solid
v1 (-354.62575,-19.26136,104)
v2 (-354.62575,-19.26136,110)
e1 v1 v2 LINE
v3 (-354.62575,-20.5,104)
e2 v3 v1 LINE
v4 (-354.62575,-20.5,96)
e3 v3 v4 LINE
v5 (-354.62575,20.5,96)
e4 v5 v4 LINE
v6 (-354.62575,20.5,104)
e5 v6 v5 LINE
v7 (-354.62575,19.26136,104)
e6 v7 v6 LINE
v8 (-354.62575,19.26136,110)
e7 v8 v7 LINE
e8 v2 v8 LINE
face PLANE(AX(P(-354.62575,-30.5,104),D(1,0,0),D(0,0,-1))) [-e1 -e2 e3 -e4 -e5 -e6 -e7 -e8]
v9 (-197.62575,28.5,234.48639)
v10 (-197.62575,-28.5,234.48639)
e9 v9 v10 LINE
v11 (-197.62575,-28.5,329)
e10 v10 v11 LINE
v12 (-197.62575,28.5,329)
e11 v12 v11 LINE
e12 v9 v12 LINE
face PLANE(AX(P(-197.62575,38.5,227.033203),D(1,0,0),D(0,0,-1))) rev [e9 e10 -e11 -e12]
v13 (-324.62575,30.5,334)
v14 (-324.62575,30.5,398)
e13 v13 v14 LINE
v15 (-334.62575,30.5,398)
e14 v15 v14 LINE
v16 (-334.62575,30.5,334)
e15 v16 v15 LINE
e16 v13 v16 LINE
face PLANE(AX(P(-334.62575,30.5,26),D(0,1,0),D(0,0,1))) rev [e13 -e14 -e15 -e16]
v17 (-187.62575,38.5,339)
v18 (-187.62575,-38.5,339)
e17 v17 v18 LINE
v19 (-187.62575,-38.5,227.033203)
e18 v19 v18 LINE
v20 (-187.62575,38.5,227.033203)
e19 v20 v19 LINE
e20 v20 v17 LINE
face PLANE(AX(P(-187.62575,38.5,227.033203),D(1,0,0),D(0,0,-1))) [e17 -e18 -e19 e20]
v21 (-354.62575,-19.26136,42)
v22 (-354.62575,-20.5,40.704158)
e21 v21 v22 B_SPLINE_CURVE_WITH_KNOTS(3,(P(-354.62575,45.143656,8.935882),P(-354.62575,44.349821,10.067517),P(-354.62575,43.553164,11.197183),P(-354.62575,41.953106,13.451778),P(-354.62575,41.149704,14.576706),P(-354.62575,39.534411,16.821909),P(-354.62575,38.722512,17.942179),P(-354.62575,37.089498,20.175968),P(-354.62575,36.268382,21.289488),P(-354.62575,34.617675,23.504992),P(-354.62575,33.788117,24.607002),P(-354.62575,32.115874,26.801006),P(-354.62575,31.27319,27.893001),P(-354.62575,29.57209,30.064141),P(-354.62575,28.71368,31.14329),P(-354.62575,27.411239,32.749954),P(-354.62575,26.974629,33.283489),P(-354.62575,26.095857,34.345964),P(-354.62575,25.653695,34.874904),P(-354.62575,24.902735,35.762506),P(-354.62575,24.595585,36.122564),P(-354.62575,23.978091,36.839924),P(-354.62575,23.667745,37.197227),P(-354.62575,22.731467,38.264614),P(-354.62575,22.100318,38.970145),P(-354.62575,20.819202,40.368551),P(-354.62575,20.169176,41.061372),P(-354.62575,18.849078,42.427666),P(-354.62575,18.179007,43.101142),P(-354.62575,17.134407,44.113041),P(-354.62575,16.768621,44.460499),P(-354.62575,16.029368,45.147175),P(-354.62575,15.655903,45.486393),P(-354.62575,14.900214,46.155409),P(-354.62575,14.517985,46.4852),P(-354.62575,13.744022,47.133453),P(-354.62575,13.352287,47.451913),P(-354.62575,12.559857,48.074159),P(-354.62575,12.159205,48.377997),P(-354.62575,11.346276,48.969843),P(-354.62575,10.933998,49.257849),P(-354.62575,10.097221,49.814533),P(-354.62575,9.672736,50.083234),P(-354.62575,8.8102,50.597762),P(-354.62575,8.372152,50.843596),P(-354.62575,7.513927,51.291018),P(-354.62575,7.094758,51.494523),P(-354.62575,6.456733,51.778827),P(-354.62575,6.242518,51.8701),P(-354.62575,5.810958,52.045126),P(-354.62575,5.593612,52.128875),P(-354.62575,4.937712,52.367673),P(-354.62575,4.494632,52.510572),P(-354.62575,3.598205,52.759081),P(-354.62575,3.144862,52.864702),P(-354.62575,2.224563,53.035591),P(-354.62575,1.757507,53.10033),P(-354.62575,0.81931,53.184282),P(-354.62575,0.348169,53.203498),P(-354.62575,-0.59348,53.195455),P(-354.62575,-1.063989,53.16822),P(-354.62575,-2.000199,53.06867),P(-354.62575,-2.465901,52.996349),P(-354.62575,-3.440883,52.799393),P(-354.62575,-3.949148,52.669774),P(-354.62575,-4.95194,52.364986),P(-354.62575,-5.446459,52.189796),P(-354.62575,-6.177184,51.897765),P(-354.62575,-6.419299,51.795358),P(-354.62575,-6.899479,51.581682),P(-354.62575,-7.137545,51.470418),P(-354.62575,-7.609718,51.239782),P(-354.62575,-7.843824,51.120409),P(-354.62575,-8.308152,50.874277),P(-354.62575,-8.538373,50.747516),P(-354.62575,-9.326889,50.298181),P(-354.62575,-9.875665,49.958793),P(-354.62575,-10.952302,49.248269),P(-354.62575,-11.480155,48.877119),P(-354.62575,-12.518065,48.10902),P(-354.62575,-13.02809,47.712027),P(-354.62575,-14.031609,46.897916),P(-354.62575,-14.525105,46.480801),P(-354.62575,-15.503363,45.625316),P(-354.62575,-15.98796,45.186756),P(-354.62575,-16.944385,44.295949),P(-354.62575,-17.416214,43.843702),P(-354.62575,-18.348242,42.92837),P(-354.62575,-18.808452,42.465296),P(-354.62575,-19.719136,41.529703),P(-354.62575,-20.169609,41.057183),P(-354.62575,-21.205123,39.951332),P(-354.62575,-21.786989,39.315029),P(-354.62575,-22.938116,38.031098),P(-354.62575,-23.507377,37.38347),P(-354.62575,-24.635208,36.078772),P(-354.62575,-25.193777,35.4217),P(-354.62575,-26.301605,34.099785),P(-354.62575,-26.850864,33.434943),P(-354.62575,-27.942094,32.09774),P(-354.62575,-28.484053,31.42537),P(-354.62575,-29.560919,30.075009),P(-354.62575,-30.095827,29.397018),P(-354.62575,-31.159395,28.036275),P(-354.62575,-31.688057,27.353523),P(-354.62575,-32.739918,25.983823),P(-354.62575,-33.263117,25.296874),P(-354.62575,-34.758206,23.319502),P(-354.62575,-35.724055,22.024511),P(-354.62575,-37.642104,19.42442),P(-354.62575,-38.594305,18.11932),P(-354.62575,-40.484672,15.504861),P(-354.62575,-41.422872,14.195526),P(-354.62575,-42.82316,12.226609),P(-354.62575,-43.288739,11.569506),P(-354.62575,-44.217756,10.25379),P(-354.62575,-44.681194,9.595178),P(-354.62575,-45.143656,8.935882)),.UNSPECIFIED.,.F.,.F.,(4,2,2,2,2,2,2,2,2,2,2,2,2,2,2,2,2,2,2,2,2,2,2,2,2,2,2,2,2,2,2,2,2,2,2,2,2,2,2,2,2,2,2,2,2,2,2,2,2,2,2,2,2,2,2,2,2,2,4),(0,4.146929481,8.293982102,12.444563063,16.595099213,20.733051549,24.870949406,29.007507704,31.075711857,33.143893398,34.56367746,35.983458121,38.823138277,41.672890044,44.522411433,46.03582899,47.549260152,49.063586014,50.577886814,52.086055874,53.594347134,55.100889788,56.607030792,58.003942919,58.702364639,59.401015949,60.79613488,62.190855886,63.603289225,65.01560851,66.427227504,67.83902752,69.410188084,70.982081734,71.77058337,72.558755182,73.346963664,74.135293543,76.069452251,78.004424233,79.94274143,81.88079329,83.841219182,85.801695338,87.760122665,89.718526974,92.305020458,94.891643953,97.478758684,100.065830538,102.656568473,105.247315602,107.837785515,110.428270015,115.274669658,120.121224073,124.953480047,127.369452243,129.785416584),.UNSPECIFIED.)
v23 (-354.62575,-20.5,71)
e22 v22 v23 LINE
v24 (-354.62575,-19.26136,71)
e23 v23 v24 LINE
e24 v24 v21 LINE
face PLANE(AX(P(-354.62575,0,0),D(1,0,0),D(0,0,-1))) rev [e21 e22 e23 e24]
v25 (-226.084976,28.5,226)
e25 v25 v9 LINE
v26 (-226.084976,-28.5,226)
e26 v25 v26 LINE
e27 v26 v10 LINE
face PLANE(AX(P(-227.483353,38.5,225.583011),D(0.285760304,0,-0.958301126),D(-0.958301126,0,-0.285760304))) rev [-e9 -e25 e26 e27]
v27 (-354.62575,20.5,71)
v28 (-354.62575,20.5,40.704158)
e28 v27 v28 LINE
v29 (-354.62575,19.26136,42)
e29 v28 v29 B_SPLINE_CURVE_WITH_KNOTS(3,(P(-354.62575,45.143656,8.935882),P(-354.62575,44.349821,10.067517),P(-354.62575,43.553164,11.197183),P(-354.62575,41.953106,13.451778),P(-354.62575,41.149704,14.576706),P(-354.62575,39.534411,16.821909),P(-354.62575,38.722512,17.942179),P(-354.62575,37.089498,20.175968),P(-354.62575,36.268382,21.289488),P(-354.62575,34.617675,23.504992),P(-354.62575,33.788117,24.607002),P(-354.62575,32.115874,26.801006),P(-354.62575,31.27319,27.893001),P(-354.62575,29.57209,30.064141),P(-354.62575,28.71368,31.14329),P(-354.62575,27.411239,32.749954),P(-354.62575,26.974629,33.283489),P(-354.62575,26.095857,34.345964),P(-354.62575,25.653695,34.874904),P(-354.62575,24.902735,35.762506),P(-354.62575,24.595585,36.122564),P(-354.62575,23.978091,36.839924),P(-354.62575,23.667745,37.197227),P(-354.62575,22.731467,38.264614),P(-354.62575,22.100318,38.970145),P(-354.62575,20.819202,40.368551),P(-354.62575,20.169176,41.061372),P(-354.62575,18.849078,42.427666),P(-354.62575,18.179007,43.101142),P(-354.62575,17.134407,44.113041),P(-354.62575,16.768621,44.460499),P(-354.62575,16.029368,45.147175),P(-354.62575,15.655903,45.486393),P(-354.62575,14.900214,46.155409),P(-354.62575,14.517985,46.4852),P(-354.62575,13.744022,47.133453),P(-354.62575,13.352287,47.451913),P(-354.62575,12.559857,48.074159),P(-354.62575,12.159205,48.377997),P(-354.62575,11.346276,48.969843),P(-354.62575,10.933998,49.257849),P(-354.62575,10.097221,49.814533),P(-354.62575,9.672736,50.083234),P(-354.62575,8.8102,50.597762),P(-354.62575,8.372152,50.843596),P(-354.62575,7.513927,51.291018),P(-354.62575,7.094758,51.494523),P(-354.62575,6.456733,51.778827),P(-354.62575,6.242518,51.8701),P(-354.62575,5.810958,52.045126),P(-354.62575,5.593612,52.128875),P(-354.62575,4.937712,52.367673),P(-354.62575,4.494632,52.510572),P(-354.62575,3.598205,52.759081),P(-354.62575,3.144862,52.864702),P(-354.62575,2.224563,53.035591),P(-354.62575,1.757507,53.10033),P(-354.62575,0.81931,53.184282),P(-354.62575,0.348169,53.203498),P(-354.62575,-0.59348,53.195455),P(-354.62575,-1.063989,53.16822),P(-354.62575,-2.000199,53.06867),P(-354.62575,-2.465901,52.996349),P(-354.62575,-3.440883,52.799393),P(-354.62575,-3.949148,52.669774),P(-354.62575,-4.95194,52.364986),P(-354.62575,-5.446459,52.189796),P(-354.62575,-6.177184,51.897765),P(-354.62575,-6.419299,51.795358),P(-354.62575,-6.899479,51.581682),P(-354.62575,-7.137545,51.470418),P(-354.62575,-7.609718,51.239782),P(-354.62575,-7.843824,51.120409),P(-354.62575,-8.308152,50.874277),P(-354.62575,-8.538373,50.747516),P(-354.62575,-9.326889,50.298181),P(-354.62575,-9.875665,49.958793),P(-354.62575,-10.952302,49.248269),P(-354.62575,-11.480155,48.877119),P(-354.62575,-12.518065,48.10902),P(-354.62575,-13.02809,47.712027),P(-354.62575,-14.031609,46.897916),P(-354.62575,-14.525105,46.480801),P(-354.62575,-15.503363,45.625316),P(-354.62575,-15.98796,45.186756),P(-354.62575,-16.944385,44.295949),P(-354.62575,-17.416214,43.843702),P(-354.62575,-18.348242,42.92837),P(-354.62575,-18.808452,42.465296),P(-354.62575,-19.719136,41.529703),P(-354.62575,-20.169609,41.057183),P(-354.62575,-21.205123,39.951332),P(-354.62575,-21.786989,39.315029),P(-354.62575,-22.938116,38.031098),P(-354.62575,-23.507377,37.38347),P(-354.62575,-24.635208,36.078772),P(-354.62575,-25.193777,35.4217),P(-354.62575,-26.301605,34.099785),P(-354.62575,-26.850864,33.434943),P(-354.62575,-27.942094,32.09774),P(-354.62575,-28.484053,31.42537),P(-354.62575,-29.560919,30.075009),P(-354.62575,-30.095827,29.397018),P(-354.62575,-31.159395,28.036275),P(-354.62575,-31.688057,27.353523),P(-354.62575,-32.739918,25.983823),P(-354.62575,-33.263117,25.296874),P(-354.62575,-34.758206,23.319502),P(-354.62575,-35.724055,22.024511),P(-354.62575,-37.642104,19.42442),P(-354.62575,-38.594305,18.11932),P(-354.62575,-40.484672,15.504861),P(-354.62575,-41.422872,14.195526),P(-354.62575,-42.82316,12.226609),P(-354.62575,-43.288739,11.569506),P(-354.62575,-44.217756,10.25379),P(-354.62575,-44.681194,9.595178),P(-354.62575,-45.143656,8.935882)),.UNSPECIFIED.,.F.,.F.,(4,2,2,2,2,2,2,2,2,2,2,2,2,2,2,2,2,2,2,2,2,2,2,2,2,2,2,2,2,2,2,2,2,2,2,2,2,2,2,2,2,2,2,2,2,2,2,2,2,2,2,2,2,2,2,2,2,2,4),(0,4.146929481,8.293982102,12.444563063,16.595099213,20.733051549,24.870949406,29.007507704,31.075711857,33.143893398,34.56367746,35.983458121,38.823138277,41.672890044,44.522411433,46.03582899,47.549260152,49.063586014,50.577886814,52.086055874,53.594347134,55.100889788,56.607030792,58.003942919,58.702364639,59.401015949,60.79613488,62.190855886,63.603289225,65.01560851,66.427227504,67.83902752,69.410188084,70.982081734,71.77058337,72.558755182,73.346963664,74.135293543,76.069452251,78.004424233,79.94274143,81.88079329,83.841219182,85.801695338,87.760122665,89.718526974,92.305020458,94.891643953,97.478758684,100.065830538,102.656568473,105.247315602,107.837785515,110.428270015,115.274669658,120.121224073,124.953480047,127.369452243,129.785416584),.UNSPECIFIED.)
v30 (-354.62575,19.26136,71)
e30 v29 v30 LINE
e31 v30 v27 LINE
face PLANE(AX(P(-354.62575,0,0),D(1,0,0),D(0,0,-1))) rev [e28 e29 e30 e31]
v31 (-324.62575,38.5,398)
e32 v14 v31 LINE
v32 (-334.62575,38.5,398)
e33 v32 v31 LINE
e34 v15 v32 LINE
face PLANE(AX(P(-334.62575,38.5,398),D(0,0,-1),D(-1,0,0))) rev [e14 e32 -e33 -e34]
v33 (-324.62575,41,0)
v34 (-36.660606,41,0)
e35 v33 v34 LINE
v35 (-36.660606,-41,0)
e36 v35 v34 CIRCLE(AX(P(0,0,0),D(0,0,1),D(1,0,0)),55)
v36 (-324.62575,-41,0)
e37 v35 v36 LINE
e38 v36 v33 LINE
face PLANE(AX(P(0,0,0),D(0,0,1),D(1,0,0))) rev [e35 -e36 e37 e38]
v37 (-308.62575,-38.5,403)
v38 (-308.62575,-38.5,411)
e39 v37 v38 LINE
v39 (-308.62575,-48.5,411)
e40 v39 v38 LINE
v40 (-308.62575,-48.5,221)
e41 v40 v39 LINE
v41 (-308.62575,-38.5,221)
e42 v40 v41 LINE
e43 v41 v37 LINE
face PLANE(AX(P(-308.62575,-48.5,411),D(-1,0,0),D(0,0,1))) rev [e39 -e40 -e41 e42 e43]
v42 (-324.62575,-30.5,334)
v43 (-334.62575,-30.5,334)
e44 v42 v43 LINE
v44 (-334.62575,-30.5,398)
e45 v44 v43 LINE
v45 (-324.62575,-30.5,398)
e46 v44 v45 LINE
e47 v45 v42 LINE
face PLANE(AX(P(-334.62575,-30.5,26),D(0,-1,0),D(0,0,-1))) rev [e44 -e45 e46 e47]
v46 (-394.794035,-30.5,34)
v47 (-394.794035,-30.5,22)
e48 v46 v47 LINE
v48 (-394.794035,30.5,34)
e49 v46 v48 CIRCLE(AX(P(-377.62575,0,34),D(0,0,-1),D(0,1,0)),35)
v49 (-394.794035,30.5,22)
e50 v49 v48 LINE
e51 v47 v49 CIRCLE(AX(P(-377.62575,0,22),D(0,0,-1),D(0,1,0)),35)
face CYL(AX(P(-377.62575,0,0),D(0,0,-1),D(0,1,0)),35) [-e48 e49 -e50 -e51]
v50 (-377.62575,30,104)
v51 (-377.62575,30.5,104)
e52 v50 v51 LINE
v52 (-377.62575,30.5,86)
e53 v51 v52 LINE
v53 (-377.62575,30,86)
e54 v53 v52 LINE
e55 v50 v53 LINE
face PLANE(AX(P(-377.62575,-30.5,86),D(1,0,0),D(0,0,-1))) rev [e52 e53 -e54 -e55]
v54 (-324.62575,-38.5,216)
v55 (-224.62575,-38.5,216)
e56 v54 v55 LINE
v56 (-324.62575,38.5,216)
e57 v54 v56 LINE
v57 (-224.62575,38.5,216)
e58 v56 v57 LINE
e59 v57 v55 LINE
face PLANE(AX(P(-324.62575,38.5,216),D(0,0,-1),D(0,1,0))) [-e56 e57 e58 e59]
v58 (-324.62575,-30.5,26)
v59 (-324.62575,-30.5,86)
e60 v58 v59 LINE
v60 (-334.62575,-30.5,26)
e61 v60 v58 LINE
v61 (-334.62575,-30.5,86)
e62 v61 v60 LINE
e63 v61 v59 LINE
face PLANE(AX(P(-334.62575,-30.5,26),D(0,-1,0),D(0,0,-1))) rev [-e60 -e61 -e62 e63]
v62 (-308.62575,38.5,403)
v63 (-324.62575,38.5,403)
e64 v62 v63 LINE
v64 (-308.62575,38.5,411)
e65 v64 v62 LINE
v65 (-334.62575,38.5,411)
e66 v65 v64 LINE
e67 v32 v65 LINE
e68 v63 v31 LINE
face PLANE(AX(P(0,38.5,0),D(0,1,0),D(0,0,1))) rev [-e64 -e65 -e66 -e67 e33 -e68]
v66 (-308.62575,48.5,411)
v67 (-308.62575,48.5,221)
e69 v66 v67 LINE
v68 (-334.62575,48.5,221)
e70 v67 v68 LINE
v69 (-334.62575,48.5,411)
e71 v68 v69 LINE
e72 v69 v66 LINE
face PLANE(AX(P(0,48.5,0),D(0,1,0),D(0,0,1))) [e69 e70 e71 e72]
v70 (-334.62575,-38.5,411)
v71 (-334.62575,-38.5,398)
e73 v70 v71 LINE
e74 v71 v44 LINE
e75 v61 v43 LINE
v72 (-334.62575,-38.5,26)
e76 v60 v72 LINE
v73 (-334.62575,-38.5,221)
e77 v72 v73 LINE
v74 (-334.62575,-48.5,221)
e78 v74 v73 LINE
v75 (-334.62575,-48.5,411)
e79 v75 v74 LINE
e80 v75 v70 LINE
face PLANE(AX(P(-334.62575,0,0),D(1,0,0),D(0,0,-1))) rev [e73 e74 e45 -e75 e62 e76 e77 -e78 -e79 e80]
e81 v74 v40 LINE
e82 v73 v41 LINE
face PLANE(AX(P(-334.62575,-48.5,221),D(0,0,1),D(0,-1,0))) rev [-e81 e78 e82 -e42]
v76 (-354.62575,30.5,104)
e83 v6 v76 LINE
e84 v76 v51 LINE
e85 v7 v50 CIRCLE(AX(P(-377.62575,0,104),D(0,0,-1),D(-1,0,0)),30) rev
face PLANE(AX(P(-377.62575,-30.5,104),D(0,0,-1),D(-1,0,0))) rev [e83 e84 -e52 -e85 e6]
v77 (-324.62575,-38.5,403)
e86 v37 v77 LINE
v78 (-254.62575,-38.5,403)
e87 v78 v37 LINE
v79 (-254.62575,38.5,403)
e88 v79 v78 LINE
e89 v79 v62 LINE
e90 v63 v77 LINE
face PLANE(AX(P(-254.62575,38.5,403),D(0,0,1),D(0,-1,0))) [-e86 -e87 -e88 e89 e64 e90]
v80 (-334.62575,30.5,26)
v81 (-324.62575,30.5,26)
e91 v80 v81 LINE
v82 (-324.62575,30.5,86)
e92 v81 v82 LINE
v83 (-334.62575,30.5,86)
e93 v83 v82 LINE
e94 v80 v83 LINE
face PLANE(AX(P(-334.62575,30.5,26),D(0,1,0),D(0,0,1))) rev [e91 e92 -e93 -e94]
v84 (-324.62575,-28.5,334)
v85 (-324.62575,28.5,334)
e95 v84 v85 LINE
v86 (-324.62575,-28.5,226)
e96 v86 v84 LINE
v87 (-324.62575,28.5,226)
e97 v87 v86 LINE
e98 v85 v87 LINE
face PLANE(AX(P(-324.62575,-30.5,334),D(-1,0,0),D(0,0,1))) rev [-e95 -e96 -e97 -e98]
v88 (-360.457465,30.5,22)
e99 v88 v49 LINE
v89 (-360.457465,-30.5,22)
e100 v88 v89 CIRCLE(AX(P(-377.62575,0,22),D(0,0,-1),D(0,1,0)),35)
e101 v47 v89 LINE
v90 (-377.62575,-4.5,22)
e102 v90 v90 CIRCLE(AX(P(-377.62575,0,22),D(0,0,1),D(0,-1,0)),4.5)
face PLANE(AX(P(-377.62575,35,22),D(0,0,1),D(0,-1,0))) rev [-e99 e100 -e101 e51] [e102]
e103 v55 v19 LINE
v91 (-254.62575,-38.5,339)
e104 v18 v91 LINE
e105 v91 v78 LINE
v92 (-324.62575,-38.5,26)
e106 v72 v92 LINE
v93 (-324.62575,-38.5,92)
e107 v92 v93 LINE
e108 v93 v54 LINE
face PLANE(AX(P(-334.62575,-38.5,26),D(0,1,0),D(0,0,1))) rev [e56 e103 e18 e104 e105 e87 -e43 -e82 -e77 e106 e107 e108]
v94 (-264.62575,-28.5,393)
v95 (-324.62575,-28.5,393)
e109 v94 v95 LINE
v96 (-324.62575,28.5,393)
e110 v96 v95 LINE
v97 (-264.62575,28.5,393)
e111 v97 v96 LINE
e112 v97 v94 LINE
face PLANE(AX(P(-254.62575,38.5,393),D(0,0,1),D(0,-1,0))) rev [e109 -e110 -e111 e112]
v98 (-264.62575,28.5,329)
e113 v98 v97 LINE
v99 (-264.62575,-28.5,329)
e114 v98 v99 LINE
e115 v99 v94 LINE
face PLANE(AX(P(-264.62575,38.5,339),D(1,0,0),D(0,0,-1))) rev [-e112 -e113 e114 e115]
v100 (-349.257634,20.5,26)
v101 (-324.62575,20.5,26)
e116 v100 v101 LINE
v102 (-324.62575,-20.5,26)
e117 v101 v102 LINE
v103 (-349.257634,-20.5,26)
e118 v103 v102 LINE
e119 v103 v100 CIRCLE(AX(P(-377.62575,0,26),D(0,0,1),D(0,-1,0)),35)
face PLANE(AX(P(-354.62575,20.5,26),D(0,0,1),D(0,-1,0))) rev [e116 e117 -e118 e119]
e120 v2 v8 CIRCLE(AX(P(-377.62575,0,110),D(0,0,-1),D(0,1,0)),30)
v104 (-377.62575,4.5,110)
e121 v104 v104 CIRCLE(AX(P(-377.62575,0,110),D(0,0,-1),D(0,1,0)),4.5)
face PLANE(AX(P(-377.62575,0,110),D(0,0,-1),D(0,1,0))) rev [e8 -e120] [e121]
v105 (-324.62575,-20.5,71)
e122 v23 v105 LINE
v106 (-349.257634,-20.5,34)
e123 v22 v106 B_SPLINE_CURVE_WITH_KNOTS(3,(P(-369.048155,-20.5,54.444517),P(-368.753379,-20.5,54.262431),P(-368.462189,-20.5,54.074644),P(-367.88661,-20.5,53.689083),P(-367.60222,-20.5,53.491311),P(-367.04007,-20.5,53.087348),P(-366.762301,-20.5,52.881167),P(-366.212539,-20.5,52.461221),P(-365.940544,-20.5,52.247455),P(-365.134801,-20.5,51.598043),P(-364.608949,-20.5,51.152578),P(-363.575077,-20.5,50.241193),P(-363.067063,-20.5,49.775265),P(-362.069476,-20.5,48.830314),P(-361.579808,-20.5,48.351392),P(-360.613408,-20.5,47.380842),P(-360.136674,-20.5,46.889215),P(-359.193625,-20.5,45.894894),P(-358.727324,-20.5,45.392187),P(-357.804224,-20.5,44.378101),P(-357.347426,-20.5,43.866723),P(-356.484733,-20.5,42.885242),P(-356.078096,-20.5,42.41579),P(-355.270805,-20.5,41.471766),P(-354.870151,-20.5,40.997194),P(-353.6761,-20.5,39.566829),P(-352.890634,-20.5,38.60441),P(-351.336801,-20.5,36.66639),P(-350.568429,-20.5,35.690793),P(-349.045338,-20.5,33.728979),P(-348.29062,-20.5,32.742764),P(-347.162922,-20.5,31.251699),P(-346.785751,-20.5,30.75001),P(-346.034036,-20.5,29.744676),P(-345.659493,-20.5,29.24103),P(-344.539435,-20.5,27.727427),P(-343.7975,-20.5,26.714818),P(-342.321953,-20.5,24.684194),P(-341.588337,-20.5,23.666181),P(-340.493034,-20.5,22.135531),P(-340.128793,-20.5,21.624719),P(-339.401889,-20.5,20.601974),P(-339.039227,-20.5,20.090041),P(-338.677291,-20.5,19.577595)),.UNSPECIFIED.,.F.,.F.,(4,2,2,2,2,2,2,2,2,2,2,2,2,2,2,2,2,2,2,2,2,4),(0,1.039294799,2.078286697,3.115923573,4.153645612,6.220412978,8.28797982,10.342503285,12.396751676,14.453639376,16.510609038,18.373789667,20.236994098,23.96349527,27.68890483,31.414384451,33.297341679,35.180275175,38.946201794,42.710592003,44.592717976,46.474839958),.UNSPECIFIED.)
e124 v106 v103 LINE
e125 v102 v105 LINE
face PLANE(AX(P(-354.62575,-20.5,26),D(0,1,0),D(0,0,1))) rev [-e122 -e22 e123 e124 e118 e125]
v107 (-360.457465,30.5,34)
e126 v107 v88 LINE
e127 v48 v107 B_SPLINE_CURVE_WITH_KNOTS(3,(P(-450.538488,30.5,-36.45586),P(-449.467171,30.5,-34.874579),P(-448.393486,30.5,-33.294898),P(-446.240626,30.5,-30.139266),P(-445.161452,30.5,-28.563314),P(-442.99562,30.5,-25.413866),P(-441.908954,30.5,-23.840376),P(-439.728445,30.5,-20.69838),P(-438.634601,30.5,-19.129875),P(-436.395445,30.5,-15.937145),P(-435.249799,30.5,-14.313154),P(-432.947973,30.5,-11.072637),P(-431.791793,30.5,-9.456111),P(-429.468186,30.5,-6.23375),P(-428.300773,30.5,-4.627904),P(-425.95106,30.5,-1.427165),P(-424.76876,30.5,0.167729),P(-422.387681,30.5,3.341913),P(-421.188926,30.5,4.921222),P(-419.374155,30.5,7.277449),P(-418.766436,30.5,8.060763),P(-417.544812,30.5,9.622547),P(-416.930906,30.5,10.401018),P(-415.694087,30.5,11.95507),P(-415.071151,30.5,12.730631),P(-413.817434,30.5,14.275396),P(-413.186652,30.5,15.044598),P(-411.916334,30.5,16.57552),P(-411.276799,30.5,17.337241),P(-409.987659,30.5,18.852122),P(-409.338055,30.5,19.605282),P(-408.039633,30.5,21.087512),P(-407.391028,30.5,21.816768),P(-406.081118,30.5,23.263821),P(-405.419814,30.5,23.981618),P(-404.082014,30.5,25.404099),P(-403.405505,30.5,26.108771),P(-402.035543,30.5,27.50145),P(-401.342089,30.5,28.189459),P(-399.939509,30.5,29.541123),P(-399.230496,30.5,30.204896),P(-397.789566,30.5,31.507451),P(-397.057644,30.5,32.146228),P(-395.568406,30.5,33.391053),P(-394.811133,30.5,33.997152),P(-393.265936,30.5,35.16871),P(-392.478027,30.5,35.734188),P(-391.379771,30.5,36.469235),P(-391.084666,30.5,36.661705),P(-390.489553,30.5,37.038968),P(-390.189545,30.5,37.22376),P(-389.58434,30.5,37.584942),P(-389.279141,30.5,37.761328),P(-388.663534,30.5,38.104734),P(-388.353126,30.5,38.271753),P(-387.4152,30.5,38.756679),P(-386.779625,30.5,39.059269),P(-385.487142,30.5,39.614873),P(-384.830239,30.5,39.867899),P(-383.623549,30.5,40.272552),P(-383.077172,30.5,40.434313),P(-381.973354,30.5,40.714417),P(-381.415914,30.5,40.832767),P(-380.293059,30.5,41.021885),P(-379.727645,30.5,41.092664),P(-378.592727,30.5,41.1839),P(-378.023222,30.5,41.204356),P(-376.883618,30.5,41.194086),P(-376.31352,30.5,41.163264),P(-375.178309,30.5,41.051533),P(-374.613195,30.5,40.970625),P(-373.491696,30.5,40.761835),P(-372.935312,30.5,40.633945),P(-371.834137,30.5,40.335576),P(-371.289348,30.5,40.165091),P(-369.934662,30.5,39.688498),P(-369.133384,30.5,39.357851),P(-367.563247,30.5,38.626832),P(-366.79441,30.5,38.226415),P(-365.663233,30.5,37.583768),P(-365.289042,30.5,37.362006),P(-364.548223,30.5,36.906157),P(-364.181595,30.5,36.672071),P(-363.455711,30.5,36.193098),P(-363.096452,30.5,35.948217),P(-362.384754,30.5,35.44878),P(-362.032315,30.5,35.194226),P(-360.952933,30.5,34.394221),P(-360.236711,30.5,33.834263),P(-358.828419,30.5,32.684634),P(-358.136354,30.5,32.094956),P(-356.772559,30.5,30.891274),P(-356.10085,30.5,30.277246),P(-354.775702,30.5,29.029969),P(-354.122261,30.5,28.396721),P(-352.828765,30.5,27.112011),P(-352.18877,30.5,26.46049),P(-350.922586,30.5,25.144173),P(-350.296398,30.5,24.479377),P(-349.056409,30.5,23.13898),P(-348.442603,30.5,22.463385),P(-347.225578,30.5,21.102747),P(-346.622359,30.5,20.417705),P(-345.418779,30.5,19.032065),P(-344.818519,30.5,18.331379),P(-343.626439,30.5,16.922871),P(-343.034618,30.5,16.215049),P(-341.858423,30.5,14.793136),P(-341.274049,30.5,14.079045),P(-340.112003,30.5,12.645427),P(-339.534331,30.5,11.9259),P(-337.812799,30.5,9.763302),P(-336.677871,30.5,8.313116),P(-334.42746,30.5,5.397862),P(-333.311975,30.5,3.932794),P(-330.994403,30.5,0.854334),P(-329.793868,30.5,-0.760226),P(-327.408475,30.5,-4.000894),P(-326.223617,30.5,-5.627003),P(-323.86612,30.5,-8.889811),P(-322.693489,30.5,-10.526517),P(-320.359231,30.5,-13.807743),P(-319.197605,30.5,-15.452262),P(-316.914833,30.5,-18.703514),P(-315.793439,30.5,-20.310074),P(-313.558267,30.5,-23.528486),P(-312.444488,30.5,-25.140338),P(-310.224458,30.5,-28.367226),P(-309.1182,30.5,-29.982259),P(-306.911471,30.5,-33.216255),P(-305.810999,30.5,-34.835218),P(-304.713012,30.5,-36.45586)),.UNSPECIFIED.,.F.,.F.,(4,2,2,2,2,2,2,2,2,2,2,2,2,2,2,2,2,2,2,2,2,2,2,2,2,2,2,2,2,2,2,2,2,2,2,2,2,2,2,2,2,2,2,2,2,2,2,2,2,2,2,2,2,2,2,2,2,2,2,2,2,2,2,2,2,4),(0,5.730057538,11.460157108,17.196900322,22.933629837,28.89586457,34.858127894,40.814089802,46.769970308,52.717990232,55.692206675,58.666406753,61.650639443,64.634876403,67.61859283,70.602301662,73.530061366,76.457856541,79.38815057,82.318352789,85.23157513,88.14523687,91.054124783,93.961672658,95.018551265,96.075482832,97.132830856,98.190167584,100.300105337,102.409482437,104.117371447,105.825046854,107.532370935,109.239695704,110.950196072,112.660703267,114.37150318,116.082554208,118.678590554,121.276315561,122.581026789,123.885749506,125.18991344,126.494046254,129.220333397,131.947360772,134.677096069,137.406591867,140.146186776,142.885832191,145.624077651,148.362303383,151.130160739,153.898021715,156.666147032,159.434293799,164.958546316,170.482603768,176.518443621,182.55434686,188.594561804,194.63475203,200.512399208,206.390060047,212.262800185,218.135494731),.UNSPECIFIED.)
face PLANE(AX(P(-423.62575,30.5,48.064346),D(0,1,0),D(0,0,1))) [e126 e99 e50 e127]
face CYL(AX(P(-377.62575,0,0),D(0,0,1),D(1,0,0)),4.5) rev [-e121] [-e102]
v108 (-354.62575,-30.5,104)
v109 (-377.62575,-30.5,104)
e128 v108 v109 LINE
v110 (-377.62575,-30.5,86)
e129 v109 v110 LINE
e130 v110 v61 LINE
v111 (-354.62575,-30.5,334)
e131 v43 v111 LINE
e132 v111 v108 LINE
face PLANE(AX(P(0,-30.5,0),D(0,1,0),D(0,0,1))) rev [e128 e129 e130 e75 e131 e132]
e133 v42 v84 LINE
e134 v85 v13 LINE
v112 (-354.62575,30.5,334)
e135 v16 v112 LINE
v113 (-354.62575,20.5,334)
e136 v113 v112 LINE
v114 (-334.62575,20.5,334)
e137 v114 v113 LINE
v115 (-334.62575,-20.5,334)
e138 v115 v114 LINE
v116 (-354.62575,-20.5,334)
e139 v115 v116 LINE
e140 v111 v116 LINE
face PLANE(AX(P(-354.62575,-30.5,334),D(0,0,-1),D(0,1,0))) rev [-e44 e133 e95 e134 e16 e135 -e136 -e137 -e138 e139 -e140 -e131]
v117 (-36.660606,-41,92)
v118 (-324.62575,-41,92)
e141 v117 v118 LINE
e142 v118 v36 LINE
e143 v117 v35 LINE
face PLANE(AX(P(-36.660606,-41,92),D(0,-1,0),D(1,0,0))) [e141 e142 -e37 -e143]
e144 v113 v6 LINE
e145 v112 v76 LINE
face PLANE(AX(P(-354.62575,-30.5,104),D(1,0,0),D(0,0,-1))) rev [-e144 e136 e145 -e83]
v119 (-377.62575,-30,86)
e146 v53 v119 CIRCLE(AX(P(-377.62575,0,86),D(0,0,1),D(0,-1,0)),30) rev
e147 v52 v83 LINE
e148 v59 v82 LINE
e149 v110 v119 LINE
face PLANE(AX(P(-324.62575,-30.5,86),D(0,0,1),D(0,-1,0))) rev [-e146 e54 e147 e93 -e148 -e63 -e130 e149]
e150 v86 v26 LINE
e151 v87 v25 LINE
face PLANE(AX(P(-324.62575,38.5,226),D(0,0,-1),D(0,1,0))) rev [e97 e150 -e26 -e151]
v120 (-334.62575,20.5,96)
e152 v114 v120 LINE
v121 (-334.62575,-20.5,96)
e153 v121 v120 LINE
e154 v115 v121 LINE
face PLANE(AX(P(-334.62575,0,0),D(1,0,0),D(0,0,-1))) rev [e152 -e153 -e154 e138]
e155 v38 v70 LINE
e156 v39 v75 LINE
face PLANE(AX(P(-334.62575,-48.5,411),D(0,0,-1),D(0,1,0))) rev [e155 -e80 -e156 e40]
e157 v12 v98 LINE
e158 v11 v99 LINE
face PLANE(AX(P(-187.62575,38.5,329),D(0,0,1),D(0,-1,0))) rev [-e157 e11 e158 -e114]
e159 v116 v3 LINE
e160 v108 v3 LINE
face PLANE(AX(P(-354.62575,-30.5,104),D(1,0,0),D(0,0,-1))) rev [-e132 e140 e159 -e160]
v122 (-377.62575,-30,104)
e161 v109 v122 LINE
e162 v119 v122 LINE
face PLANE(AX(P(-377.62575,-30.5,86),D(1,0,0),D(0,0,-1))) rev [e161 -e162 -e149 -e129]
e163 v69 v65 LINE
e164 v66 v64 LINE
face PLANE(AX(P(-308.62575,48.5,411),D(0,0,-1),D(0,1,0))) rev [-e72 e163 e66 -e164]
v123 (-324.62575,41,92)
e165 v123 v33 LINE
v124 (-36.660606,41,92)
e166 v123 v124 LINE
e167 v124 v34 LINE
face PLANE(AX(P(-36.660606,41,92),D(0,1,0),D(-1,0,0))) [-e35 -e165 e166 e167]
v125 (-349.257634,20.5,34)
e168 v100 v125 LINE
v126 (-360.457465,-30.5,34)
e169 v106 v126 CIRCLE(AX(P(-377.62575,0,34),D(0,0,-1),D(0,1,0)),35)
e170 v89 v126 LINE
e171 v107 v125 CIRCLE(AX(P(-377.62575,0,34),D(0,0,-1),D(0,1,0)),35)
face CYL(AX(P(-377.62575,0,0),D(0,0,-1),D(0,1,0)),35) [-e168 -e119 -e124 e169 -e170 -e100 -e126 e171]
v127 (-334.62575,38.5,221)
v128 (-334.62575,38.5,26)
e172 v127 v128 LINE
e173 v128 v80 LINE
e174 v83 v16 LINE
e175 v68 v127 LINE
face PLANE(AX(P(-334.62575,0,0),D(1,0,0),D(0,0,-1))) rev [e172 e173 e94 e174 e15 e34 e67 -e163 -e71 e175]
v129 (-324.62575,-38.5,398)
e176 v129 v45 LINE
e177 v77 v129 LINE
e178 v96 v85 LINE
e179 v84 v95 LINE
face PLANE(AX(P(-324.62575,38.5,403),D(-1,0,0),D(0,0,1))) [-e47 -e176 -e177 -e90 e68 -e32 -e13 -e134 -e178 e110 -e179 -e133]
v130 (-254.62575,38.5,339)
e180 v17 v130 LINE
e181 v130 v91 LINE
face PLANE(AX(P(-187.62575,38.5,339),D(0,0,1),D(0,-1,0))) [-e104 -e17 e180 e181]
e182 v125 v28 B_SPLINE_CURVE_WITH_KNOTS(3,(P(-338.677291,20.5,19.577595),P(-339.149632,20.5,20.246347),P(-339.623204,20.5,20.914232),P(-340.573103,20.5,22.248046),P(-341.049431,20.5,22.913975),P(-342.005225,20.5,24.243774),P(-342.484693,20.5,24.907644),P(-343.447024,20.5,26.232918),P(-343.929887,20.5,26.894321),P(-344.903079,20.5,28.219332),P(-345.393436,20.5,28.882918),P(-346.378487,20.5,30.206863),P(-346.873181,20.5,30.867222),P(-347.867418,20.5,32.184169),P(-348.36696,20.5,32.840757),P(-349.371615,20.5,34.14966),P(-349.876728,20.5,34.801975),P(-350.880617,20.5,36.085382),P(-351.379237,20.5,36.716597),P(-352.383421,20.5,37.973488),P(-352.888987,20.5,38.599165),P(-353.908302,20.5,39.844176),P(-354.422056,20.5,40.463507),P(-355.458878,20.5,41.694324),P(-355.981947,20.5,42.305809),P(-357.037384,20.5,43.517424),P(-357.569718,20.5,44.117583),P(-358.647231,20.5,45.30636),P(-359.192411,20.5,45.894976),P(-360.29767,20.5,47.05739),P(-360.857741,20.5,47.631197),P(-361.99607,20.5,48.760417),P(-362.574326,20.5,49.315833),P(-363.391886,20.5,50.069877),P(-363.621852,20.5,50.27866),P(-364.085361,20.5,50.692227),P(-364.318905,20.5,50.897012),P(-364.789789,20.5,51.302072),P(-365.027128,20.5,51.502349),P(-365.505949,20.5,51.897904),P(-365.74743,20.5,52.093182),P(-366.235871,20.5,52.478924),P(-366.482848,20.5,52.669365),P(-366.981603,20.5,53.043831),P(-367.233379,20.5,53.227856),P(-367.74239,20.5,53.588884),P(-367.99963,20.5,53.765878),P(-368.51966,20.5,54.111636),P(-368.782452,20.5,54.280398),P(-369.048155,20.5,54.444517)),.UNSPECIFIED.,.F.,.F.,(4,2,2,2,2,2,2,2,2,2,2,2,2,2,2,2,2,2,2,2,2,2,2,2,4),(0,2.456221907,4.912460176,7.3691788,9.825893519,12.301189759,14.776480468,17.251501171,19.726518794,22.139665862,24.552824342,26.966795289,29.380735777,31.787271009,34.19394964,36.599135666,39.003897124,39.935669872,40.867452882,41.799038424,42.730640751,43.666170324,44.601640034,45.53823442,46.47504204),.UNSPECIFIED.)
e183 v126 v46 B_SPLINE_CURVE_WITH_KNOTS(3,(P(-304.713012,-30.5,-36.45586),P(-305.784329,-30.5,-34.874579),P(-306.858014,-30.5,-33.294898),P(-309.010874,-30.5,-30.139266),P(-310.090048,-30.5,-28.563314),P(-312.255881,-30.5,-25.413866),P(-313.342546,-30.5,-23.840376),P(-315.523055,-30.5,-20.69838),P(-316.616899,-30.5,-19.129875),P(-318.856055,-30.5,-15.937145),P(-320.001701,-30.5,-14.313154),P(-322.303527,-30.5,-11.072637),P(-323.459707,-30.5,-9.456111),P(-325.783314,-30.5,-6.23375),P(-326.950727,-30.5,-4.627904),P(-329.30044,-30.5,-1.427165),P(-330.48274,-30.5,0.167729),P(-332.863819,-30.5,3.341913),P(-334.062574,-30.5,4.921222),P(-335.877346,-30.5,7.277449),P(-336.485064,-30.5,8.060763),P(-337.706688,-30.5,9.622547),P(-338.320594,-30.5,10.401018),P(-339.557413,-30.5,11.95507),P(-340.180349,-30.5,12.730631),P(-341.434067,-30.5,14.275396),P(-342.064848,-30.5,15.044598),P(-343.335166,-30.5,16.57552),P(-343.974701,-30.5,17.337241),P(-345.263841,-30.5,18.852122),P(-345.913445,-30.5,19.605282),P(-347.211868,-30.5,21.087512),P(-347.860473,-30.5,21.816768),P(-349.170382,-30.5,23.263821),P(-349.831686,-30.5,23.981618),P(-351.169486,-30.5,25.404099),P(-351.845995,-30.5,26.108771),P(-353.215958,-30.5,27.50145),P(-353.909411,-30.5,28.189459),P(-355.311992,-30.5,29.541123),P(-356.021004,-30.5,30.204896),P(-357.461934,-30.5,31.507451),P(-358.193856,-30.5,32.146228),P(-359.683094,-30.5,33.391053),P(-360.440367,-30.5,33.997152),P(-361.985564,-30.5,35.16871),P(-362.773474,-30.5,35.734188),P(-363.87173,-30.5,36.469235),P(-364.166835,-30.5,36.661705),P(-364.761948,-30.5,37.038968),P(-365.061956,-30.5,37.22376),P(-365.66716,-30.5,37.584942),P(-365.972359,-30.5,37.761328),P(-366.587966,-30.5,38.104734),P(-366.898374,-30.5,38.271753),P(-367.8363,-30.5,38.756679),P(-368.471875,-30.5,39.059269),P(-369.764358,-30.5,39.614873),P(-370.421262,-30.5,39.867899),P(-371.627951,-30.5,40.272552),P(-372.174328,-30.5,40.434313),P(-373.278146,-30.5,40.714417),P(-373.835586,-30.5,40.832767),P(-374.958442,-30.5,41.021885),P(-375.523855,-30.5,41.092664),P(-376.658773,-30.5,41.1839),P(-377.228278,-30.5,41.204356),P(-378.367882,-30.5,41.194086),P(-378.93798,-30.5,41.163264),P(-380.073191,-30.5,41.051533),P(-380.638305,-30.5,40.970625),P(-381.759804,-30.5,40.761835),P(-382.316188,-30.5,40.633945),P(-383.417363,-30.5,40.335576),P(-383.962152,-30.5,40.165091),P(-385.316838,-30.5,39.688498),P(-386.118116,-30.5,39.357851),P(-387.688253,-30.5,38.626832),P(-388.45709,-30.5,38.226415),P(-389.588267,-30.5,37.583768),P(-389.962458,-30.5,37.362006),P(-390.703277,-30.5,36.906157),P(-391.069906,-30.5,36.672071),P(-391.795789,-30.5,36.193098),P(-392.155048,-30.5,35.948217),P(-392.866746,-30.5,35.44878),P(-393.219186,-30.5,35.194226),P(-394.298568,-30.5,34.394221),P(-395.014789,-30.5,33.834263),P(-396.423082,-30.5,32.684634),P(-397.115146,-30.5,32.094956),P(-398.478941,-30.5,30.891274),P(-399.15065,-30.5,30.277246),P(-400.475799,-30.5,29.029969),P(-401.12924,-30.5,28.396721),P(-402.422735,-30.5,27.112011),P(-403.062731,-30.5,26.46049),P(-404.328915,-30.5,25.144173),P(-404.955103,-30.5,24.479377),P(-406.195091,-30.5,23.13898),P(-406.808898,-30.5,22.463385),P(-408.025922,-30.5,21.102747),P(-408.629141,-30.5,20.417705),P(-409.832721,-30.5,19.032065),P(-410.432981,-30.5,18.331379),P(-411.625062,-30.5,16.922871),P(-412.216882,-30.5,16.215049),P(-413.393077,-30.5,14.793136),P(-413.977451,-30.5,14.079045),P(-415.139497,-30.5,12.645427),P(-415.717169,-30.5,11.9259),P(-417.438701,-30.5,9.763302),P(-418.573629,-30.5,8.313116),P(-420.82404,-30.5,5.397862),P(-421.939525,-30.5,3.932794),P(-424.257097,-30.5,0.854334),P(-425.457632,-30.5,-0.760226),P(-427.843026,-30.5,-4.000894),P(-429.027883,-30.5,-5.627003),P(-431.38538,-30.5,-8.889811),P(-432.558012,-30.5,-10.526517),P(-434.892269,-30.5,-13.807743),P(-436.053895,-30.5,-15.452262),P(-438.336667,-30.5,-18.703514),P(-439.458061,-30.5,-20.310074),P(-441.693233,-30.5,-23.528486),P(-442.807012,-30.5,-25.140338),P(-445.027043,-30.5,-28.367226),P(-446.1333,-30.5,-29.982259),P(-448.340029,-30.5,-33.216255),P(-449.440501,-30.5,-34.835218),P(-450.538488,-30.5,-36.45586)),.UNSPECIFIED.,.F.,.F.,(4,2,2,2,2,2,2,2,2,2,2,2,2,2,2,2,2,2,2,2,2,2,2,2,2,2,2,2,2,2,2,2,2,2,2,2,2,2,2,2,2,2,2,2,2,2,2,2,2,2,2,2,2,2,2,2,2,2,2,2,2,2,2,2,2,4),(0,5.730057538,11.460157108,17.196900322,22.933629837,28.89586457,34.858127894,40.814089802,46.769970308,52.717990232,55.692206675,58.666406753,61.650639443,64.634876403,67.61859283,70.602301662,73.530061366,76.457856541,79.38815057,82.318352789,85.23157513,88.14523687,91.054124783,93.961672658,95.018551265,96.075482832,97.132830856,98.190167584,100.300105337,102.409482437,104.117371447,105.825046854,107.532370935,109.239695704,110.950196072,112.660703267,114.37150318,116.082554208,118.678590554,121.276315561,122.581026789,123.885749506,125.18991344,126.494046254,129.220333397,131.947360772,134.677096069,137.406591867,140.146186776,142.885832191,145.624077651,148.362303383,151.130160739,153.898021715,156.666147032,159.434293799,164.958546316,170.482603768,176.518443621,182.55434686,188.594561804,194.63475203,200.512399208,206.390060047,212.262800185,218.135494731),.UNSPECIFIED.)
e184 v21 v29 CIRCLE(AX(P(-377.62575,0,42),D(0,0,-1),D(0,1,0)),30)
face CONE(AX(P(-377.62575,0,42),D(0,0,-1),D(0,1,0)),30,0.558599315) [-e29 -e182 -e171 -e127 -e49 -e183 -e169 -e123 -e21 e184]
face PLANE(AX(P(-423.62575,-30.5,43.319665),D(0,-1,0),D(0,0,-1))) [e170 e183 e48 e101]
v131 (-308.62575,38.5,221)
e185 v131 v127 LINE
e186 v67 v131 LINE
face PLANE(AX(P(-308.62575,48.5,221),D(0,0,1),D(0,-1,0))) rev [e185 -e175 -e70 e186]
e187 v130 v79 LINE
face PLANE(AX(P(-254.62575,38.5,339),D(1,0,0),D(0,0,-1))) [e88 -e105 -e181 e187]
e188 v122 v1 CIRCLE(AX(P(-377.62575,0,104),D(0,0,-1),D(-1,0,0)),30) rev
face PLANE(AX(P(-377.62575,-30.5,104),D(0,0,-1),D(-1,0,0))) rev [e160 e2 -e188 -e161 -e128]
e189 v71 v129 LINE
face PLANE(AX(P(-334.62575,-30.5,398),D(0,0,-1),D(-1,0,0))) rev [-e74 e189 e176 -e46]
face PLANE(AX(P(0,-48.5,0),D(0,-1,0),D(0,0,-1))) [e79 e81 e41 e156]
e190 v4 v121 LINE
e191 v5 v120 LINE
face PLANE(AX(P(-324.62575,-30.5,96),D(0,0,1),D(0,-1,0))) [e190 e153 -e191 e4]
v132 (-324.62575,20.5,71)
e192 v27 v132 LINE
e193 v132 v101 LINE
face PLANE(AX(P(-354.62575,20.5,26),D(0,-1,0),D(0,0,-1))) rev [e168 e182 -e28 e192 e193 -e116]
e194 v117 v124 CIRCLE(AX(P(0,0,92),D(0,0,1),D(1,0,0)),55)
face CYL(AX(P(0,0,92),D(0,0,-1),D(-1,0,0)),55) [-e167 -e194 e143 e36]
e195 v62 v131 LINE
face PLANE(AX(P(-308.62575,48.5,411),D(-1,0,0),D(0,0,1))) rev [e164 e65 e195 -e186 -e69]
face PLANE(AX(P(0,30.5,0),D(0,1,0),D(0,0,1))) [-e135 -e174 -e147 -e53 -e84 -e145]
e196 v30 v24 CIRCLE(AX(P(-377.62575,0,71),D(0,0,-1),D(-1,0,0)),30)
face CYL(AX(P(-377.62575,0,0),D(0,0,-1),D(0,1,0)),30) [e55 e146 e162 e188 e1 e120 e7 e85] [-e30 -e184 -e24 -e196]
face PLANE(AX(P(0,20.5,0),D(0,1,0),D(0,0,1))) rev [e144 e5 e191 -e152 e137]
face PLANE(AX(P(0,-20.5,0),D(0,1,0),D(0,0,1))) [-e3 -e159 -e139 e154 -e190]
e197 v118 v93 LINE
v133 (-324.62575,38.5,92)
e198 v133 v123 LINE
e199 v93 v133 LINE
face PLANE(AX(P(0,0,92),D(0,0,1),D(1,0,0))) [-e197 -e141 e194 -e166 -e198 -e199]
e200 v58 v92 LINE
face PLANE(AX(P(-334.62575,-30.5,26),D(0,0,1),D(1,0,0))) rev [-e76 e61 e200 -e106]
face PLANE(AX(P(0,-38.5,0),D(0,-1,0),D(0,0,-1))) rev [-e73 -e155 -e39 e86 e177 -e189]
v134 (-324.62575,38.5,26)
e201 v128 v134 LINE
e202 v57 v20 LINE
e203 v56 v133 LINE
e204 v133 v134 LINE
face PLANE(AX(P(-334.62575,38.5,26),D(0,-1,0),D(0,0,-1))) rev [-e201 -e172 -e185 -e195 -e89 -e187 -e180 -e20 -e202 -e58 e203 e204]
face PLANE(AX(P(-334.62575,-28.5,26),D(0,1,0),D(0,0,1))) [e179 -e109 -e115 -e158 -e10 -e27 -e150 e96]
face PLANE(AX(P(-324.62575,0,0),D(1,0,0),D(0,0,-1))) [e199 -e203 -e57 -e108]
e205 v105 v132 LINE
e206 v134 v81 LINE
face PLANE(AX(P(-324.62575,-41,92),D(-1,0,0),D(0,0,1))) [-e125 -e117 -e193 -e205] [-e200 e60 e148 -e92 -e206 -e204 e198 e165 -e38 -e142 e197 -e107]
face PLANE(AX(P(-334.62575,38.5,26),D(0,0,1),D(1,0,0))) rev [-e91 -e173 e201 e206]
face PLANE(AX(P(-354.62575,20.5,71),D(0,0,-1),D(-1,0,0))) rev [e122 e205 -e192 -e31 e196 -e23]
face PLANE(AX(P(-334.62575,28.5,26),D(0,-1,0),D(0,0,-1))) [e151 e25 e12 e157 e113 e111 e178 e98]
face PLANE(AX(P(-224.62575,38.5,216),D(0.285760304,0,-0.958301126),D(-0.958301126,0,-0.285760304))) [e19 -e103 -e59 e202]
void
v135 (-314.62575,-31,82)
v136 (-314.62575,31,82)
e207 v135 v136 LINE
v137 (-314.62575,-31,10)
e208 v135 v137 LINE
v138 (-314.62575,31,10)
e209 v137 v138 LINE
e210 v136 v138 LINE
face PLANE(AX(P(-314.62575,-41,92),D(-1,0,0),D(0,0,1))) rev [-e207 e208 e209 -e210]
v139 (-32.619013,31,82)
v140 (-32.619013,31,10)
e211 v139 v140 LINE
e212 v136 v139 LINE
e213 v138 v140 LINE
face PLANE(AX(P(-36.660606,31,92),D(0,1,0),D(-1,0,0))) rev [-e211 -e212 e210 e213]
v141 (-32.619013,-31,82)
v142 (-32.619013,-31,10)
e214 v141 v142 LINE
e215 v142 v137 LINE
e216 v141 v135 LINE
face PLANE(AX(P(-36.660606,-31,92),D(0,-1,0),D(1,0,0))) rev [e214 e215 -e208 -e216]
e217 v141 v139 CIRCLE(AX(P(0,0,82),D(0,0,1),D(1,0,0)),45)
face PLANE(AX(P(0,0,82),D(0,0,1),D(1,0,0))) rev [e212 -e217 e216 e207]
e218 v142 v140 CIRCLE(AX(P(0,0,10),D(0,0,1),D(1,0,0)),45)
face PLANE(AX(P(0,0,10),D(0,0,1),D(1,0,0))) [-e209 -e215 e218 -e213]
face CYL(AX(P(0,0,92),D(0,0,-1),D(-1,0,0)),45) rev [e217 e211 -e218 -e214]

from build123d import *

# Parameters (mm, degrees)
CROQUIS1_R                 = 55
SALIENTE_EXTRUIR1_DEPTH    = 92
CROQUIS2_W                 = 287.965144552
CROQUIS2_H                 = 82
SALIENTE_EXTRUIR2_DEPTH    = 92
CROQUIS5_W                 = 372
CROQUIS5_H                 = 8
SALIENTE_EXTRUIR5_DEPTH    = 10
SALIENTE_EXTRUIR6_START    = -77
SALIENTE_EXTRUIR6_DEPTH    = 77
VACIADO1_START             = -28.5
VACIADO1_DEPTH             = 57
VACIADO1_START_2           = 10
VACIADO1_2_DEPTH           = 72
CROQUIS8_W                 = 26
CROQUIS8_H                 = 190
SALIENTE_EXTRUIR7_DEPTH    = 10
CROQUIS9_W                 = 26
CROQUIS9_H                 = 190
SALIENTE_EXTRUIR8_DEPTH    = 10
SALIENTE_EXTRUIR9_DEPTH    = 61
CORTAR_EXTRUIR1_DEPTH      = 69
CORTAR_EXTRUIR1_DEPTH_BACK = 16
CORTAR_EXTRUIR2_DEPTH      = 514.698364466
CORTAR_EXTRUIR2_DEPTH_BACK = 514.698364466
CROQUIS14_R                = 4.5
VACIADO4_START             = -354.625750112
VACIADO4_OUTLINE_W         = 41
VACIADO4_OUTLINE_H         = 238
VACIADO4_DEPTH             = 20
CROQUIS15_W                = 45
CROQUIS15_H                = 41
SALIENTE_EXTRUIR10_DEPTH   = 30


# Read off the part's stored shape, not the designer's step: Vaciado1, Vaciado4
with BuildPart() as part:
    # Croquis1 → Saliente-Extruir1 (new body)
    with BuildSketch(Plane.XY):
        Circle(CROQUIS1_R)
    extrude(amount=SALIENTE_EXTRUIR1_DEPTH)

    # Croquis2 → Saliente-Extruir2 (add)
    with BuildSketch(Plane(origin=(0, 0, 0), x_dir=(-1, 0, 0), z_dir=(0, 0, -1))):
        with Locations((180.643177836, 0)):
            Rectangle(CROQUIS2_W, CROQUIS2_H)
    extrude(amount=-SALIENTE_EXTRUIR2_DEPTH)

    # Croquis5 → Saliente-Extruir5 (add)
    with BuildSketch(Plane.ZY.offset(324.625750112)):
        with Locations((212, 34.5)):
            Rectangle(CROQUIS5_W, CROQUIS5_H)
        with Locations((212, -34.5)):
            Rectangle(CROQUIS5_W, CROQUIS5_H)
    extrude(amount=SALIENTE_EXTRUIR5_DEPTH)

    # Croquis6 → Saliente-Extruir6 (add)
    with BuildSketch(Plane.XZ.offset(38.5).offset(SALIENTE_EXTRUIR6_START)):
        Polygon((-324.625750112, 216), (-224.625750112, 216), (-187.625750112, 227.033203383), (-187.625750112, 339), (-254.625750112, 339), (-254.625750112, 403), (-324.625750112, 403), align=None)
    extrude(amount=SALIENTE_EXTRUIR6_DEPTH)

    # Vaciado1 outline → Vaciado1 (cut)
    with BuildSketch(Plane(origin=(0, 0, 0), x_dir=(1, 0, 0), z_dir=(0, 1, 0)).offset(VACIADO1_START)):
        Polygon((-197.625750112, -234.486389827), (-226.08497566, -226), (-324.625750112, -226), (-324.625750112, -393), (-264.625750112, -393), (-264.625750112, -329), (-197.625750112, -329), align=None)
    extrude(amount=VACIADO1_DEPTH, mode=Mode.SUBTRACT)

    # Vaciado1 2 outline → Vaciado1 2 (cut)
    with BuildSketch(Plane.XY.offset(VACIADO1_START_2)):
        with BuildLine():
            Line((-32.619012861, 31), (-314.625750112, 31))
            Line((-314.625750112, 31), (-314.625750112, -31))
            Line((-314.625750112, -31), (-32.619012861, -31))
            ThreePointArc((-32.619012861, -31), (45, 0), (-32.619012861, 31))
        make_face()
    extrude(amount=VACIADO1_2_DEPTH, mode=Mode.SUBTRACT)

    # Croquis8 → Saliente-Extruir7 (add)
    with BuildSketch(Plane(origin=(0, 38.5, 0), x_dir=(1, 0, 0), z_dir=(0, 1, 0))):
        with Locations((-321.625750112, -316)):
            Rectangle(CROQUIS8_W, CROQUIS8_H)
    extrude(amount=SALIENTE_EXTRUIR7_DEPTH)

    # Croquis9 → Saliente-Extruir8 (add)
    with BuildSketch(Plane.XZ.offset(38.5)):
        with Locations((-321.625750112, 316)):
            Rectangle(CROQUIS9_W, CROQUIS9_H)
    extrude(amount=SALIENTE_EXTRUIR8_DEPTH)

    # Croquis10 → Saliente-Extruir9 (add)
    with BuildSketch(Plane.XZ.offset(-30.5)):
        Polygon((-324.625750112, 86), (-377.625750112, 86), (-377.625750112, 104), (-354.625750112, 104), (-354.625750112, 334), (-324.625750112, 334), align=None)
    extrude(amount=SALIENTE_EXTRUIR9_DEPTH)

    # Croquis11 → Revolución1 (revolve)
    with BuildSketch(Plane.ZY.offset(377.625750112)):
        Polygon((110, 0), (110, 30), (42, 30), (34, 35), (22, 35), (22, 0), align=None)
    revolve(axis=Axis((-377.625750112, 0, 0), (0, 0, 1)))

    # Croquis13 → Cortar-Extruir1 (cut, two sides: drawn at the far end of the back side and taken through both)
    with BuildSketch(Plane.ZY.offset(354.625750112).offset(-CORTAR_EXTRUIR1_DEPTH_BACK)):
        Polygon((48.064346335, 30.5), (14.405684341, 30.5), (14.405684341, 38.395591982), (46.194420669, 38.5), align=None)
        Polygon((43.319665348, -30.5), (18.175664467, -30.5), (19.260307642, -37.859564216), (38.945879671, -34.958329751), align=None)
    extrude(amount=CORTAR_EXTRUIR1_DEPTH + CORTAR_EXTRUIR1_DEPTH_BACK, mode=Mode.SUBTRACT)

    # Croquis14 → Cortar-Extruir2 (cut, two sides: drawn at the far end of the back side and taken through both)
    with BuildSketch(Plane.XY.offset(110).offset(-CORTAR_EXTRUIR2_DEPTH_BACK)):
        with Locations(Location((-377.625750112, 0, 0), (0, 0, 90))):
            Circle(CROQUIS14_R)
    extrude(amount=CORTAR_EXTRUIR2_DEPTH + CORTAR_EXTRUIR2_DEPTH_BACK, mode=Mode.SUBTRACT)

    # Vaciado4 outline → Vaciado4 (cut)
    with BuildSketch(Plane.YZ.offset(VACIADO4_START)):
        with Locations((0, 215)):
            Rectangle(VACIADO4_OUTLINE_W, VACIADO4_OUTLINE_H)
    extrude(amount=VACIADO4_DEPTH, mode=Mode.SUBTRACT)

    # Croquis15 → Saliente-Extruir10 (add)
    with BuildSketch(Plane.ZY.offset(324.625750112)):
        with Locations((48.5, 0)):
            Rectangle(CROQUIS15_W, CROQUIS15_H)
    extrude(amount=SALIENTE_EXTRUIR10_DEPTH)


solid = part.part
